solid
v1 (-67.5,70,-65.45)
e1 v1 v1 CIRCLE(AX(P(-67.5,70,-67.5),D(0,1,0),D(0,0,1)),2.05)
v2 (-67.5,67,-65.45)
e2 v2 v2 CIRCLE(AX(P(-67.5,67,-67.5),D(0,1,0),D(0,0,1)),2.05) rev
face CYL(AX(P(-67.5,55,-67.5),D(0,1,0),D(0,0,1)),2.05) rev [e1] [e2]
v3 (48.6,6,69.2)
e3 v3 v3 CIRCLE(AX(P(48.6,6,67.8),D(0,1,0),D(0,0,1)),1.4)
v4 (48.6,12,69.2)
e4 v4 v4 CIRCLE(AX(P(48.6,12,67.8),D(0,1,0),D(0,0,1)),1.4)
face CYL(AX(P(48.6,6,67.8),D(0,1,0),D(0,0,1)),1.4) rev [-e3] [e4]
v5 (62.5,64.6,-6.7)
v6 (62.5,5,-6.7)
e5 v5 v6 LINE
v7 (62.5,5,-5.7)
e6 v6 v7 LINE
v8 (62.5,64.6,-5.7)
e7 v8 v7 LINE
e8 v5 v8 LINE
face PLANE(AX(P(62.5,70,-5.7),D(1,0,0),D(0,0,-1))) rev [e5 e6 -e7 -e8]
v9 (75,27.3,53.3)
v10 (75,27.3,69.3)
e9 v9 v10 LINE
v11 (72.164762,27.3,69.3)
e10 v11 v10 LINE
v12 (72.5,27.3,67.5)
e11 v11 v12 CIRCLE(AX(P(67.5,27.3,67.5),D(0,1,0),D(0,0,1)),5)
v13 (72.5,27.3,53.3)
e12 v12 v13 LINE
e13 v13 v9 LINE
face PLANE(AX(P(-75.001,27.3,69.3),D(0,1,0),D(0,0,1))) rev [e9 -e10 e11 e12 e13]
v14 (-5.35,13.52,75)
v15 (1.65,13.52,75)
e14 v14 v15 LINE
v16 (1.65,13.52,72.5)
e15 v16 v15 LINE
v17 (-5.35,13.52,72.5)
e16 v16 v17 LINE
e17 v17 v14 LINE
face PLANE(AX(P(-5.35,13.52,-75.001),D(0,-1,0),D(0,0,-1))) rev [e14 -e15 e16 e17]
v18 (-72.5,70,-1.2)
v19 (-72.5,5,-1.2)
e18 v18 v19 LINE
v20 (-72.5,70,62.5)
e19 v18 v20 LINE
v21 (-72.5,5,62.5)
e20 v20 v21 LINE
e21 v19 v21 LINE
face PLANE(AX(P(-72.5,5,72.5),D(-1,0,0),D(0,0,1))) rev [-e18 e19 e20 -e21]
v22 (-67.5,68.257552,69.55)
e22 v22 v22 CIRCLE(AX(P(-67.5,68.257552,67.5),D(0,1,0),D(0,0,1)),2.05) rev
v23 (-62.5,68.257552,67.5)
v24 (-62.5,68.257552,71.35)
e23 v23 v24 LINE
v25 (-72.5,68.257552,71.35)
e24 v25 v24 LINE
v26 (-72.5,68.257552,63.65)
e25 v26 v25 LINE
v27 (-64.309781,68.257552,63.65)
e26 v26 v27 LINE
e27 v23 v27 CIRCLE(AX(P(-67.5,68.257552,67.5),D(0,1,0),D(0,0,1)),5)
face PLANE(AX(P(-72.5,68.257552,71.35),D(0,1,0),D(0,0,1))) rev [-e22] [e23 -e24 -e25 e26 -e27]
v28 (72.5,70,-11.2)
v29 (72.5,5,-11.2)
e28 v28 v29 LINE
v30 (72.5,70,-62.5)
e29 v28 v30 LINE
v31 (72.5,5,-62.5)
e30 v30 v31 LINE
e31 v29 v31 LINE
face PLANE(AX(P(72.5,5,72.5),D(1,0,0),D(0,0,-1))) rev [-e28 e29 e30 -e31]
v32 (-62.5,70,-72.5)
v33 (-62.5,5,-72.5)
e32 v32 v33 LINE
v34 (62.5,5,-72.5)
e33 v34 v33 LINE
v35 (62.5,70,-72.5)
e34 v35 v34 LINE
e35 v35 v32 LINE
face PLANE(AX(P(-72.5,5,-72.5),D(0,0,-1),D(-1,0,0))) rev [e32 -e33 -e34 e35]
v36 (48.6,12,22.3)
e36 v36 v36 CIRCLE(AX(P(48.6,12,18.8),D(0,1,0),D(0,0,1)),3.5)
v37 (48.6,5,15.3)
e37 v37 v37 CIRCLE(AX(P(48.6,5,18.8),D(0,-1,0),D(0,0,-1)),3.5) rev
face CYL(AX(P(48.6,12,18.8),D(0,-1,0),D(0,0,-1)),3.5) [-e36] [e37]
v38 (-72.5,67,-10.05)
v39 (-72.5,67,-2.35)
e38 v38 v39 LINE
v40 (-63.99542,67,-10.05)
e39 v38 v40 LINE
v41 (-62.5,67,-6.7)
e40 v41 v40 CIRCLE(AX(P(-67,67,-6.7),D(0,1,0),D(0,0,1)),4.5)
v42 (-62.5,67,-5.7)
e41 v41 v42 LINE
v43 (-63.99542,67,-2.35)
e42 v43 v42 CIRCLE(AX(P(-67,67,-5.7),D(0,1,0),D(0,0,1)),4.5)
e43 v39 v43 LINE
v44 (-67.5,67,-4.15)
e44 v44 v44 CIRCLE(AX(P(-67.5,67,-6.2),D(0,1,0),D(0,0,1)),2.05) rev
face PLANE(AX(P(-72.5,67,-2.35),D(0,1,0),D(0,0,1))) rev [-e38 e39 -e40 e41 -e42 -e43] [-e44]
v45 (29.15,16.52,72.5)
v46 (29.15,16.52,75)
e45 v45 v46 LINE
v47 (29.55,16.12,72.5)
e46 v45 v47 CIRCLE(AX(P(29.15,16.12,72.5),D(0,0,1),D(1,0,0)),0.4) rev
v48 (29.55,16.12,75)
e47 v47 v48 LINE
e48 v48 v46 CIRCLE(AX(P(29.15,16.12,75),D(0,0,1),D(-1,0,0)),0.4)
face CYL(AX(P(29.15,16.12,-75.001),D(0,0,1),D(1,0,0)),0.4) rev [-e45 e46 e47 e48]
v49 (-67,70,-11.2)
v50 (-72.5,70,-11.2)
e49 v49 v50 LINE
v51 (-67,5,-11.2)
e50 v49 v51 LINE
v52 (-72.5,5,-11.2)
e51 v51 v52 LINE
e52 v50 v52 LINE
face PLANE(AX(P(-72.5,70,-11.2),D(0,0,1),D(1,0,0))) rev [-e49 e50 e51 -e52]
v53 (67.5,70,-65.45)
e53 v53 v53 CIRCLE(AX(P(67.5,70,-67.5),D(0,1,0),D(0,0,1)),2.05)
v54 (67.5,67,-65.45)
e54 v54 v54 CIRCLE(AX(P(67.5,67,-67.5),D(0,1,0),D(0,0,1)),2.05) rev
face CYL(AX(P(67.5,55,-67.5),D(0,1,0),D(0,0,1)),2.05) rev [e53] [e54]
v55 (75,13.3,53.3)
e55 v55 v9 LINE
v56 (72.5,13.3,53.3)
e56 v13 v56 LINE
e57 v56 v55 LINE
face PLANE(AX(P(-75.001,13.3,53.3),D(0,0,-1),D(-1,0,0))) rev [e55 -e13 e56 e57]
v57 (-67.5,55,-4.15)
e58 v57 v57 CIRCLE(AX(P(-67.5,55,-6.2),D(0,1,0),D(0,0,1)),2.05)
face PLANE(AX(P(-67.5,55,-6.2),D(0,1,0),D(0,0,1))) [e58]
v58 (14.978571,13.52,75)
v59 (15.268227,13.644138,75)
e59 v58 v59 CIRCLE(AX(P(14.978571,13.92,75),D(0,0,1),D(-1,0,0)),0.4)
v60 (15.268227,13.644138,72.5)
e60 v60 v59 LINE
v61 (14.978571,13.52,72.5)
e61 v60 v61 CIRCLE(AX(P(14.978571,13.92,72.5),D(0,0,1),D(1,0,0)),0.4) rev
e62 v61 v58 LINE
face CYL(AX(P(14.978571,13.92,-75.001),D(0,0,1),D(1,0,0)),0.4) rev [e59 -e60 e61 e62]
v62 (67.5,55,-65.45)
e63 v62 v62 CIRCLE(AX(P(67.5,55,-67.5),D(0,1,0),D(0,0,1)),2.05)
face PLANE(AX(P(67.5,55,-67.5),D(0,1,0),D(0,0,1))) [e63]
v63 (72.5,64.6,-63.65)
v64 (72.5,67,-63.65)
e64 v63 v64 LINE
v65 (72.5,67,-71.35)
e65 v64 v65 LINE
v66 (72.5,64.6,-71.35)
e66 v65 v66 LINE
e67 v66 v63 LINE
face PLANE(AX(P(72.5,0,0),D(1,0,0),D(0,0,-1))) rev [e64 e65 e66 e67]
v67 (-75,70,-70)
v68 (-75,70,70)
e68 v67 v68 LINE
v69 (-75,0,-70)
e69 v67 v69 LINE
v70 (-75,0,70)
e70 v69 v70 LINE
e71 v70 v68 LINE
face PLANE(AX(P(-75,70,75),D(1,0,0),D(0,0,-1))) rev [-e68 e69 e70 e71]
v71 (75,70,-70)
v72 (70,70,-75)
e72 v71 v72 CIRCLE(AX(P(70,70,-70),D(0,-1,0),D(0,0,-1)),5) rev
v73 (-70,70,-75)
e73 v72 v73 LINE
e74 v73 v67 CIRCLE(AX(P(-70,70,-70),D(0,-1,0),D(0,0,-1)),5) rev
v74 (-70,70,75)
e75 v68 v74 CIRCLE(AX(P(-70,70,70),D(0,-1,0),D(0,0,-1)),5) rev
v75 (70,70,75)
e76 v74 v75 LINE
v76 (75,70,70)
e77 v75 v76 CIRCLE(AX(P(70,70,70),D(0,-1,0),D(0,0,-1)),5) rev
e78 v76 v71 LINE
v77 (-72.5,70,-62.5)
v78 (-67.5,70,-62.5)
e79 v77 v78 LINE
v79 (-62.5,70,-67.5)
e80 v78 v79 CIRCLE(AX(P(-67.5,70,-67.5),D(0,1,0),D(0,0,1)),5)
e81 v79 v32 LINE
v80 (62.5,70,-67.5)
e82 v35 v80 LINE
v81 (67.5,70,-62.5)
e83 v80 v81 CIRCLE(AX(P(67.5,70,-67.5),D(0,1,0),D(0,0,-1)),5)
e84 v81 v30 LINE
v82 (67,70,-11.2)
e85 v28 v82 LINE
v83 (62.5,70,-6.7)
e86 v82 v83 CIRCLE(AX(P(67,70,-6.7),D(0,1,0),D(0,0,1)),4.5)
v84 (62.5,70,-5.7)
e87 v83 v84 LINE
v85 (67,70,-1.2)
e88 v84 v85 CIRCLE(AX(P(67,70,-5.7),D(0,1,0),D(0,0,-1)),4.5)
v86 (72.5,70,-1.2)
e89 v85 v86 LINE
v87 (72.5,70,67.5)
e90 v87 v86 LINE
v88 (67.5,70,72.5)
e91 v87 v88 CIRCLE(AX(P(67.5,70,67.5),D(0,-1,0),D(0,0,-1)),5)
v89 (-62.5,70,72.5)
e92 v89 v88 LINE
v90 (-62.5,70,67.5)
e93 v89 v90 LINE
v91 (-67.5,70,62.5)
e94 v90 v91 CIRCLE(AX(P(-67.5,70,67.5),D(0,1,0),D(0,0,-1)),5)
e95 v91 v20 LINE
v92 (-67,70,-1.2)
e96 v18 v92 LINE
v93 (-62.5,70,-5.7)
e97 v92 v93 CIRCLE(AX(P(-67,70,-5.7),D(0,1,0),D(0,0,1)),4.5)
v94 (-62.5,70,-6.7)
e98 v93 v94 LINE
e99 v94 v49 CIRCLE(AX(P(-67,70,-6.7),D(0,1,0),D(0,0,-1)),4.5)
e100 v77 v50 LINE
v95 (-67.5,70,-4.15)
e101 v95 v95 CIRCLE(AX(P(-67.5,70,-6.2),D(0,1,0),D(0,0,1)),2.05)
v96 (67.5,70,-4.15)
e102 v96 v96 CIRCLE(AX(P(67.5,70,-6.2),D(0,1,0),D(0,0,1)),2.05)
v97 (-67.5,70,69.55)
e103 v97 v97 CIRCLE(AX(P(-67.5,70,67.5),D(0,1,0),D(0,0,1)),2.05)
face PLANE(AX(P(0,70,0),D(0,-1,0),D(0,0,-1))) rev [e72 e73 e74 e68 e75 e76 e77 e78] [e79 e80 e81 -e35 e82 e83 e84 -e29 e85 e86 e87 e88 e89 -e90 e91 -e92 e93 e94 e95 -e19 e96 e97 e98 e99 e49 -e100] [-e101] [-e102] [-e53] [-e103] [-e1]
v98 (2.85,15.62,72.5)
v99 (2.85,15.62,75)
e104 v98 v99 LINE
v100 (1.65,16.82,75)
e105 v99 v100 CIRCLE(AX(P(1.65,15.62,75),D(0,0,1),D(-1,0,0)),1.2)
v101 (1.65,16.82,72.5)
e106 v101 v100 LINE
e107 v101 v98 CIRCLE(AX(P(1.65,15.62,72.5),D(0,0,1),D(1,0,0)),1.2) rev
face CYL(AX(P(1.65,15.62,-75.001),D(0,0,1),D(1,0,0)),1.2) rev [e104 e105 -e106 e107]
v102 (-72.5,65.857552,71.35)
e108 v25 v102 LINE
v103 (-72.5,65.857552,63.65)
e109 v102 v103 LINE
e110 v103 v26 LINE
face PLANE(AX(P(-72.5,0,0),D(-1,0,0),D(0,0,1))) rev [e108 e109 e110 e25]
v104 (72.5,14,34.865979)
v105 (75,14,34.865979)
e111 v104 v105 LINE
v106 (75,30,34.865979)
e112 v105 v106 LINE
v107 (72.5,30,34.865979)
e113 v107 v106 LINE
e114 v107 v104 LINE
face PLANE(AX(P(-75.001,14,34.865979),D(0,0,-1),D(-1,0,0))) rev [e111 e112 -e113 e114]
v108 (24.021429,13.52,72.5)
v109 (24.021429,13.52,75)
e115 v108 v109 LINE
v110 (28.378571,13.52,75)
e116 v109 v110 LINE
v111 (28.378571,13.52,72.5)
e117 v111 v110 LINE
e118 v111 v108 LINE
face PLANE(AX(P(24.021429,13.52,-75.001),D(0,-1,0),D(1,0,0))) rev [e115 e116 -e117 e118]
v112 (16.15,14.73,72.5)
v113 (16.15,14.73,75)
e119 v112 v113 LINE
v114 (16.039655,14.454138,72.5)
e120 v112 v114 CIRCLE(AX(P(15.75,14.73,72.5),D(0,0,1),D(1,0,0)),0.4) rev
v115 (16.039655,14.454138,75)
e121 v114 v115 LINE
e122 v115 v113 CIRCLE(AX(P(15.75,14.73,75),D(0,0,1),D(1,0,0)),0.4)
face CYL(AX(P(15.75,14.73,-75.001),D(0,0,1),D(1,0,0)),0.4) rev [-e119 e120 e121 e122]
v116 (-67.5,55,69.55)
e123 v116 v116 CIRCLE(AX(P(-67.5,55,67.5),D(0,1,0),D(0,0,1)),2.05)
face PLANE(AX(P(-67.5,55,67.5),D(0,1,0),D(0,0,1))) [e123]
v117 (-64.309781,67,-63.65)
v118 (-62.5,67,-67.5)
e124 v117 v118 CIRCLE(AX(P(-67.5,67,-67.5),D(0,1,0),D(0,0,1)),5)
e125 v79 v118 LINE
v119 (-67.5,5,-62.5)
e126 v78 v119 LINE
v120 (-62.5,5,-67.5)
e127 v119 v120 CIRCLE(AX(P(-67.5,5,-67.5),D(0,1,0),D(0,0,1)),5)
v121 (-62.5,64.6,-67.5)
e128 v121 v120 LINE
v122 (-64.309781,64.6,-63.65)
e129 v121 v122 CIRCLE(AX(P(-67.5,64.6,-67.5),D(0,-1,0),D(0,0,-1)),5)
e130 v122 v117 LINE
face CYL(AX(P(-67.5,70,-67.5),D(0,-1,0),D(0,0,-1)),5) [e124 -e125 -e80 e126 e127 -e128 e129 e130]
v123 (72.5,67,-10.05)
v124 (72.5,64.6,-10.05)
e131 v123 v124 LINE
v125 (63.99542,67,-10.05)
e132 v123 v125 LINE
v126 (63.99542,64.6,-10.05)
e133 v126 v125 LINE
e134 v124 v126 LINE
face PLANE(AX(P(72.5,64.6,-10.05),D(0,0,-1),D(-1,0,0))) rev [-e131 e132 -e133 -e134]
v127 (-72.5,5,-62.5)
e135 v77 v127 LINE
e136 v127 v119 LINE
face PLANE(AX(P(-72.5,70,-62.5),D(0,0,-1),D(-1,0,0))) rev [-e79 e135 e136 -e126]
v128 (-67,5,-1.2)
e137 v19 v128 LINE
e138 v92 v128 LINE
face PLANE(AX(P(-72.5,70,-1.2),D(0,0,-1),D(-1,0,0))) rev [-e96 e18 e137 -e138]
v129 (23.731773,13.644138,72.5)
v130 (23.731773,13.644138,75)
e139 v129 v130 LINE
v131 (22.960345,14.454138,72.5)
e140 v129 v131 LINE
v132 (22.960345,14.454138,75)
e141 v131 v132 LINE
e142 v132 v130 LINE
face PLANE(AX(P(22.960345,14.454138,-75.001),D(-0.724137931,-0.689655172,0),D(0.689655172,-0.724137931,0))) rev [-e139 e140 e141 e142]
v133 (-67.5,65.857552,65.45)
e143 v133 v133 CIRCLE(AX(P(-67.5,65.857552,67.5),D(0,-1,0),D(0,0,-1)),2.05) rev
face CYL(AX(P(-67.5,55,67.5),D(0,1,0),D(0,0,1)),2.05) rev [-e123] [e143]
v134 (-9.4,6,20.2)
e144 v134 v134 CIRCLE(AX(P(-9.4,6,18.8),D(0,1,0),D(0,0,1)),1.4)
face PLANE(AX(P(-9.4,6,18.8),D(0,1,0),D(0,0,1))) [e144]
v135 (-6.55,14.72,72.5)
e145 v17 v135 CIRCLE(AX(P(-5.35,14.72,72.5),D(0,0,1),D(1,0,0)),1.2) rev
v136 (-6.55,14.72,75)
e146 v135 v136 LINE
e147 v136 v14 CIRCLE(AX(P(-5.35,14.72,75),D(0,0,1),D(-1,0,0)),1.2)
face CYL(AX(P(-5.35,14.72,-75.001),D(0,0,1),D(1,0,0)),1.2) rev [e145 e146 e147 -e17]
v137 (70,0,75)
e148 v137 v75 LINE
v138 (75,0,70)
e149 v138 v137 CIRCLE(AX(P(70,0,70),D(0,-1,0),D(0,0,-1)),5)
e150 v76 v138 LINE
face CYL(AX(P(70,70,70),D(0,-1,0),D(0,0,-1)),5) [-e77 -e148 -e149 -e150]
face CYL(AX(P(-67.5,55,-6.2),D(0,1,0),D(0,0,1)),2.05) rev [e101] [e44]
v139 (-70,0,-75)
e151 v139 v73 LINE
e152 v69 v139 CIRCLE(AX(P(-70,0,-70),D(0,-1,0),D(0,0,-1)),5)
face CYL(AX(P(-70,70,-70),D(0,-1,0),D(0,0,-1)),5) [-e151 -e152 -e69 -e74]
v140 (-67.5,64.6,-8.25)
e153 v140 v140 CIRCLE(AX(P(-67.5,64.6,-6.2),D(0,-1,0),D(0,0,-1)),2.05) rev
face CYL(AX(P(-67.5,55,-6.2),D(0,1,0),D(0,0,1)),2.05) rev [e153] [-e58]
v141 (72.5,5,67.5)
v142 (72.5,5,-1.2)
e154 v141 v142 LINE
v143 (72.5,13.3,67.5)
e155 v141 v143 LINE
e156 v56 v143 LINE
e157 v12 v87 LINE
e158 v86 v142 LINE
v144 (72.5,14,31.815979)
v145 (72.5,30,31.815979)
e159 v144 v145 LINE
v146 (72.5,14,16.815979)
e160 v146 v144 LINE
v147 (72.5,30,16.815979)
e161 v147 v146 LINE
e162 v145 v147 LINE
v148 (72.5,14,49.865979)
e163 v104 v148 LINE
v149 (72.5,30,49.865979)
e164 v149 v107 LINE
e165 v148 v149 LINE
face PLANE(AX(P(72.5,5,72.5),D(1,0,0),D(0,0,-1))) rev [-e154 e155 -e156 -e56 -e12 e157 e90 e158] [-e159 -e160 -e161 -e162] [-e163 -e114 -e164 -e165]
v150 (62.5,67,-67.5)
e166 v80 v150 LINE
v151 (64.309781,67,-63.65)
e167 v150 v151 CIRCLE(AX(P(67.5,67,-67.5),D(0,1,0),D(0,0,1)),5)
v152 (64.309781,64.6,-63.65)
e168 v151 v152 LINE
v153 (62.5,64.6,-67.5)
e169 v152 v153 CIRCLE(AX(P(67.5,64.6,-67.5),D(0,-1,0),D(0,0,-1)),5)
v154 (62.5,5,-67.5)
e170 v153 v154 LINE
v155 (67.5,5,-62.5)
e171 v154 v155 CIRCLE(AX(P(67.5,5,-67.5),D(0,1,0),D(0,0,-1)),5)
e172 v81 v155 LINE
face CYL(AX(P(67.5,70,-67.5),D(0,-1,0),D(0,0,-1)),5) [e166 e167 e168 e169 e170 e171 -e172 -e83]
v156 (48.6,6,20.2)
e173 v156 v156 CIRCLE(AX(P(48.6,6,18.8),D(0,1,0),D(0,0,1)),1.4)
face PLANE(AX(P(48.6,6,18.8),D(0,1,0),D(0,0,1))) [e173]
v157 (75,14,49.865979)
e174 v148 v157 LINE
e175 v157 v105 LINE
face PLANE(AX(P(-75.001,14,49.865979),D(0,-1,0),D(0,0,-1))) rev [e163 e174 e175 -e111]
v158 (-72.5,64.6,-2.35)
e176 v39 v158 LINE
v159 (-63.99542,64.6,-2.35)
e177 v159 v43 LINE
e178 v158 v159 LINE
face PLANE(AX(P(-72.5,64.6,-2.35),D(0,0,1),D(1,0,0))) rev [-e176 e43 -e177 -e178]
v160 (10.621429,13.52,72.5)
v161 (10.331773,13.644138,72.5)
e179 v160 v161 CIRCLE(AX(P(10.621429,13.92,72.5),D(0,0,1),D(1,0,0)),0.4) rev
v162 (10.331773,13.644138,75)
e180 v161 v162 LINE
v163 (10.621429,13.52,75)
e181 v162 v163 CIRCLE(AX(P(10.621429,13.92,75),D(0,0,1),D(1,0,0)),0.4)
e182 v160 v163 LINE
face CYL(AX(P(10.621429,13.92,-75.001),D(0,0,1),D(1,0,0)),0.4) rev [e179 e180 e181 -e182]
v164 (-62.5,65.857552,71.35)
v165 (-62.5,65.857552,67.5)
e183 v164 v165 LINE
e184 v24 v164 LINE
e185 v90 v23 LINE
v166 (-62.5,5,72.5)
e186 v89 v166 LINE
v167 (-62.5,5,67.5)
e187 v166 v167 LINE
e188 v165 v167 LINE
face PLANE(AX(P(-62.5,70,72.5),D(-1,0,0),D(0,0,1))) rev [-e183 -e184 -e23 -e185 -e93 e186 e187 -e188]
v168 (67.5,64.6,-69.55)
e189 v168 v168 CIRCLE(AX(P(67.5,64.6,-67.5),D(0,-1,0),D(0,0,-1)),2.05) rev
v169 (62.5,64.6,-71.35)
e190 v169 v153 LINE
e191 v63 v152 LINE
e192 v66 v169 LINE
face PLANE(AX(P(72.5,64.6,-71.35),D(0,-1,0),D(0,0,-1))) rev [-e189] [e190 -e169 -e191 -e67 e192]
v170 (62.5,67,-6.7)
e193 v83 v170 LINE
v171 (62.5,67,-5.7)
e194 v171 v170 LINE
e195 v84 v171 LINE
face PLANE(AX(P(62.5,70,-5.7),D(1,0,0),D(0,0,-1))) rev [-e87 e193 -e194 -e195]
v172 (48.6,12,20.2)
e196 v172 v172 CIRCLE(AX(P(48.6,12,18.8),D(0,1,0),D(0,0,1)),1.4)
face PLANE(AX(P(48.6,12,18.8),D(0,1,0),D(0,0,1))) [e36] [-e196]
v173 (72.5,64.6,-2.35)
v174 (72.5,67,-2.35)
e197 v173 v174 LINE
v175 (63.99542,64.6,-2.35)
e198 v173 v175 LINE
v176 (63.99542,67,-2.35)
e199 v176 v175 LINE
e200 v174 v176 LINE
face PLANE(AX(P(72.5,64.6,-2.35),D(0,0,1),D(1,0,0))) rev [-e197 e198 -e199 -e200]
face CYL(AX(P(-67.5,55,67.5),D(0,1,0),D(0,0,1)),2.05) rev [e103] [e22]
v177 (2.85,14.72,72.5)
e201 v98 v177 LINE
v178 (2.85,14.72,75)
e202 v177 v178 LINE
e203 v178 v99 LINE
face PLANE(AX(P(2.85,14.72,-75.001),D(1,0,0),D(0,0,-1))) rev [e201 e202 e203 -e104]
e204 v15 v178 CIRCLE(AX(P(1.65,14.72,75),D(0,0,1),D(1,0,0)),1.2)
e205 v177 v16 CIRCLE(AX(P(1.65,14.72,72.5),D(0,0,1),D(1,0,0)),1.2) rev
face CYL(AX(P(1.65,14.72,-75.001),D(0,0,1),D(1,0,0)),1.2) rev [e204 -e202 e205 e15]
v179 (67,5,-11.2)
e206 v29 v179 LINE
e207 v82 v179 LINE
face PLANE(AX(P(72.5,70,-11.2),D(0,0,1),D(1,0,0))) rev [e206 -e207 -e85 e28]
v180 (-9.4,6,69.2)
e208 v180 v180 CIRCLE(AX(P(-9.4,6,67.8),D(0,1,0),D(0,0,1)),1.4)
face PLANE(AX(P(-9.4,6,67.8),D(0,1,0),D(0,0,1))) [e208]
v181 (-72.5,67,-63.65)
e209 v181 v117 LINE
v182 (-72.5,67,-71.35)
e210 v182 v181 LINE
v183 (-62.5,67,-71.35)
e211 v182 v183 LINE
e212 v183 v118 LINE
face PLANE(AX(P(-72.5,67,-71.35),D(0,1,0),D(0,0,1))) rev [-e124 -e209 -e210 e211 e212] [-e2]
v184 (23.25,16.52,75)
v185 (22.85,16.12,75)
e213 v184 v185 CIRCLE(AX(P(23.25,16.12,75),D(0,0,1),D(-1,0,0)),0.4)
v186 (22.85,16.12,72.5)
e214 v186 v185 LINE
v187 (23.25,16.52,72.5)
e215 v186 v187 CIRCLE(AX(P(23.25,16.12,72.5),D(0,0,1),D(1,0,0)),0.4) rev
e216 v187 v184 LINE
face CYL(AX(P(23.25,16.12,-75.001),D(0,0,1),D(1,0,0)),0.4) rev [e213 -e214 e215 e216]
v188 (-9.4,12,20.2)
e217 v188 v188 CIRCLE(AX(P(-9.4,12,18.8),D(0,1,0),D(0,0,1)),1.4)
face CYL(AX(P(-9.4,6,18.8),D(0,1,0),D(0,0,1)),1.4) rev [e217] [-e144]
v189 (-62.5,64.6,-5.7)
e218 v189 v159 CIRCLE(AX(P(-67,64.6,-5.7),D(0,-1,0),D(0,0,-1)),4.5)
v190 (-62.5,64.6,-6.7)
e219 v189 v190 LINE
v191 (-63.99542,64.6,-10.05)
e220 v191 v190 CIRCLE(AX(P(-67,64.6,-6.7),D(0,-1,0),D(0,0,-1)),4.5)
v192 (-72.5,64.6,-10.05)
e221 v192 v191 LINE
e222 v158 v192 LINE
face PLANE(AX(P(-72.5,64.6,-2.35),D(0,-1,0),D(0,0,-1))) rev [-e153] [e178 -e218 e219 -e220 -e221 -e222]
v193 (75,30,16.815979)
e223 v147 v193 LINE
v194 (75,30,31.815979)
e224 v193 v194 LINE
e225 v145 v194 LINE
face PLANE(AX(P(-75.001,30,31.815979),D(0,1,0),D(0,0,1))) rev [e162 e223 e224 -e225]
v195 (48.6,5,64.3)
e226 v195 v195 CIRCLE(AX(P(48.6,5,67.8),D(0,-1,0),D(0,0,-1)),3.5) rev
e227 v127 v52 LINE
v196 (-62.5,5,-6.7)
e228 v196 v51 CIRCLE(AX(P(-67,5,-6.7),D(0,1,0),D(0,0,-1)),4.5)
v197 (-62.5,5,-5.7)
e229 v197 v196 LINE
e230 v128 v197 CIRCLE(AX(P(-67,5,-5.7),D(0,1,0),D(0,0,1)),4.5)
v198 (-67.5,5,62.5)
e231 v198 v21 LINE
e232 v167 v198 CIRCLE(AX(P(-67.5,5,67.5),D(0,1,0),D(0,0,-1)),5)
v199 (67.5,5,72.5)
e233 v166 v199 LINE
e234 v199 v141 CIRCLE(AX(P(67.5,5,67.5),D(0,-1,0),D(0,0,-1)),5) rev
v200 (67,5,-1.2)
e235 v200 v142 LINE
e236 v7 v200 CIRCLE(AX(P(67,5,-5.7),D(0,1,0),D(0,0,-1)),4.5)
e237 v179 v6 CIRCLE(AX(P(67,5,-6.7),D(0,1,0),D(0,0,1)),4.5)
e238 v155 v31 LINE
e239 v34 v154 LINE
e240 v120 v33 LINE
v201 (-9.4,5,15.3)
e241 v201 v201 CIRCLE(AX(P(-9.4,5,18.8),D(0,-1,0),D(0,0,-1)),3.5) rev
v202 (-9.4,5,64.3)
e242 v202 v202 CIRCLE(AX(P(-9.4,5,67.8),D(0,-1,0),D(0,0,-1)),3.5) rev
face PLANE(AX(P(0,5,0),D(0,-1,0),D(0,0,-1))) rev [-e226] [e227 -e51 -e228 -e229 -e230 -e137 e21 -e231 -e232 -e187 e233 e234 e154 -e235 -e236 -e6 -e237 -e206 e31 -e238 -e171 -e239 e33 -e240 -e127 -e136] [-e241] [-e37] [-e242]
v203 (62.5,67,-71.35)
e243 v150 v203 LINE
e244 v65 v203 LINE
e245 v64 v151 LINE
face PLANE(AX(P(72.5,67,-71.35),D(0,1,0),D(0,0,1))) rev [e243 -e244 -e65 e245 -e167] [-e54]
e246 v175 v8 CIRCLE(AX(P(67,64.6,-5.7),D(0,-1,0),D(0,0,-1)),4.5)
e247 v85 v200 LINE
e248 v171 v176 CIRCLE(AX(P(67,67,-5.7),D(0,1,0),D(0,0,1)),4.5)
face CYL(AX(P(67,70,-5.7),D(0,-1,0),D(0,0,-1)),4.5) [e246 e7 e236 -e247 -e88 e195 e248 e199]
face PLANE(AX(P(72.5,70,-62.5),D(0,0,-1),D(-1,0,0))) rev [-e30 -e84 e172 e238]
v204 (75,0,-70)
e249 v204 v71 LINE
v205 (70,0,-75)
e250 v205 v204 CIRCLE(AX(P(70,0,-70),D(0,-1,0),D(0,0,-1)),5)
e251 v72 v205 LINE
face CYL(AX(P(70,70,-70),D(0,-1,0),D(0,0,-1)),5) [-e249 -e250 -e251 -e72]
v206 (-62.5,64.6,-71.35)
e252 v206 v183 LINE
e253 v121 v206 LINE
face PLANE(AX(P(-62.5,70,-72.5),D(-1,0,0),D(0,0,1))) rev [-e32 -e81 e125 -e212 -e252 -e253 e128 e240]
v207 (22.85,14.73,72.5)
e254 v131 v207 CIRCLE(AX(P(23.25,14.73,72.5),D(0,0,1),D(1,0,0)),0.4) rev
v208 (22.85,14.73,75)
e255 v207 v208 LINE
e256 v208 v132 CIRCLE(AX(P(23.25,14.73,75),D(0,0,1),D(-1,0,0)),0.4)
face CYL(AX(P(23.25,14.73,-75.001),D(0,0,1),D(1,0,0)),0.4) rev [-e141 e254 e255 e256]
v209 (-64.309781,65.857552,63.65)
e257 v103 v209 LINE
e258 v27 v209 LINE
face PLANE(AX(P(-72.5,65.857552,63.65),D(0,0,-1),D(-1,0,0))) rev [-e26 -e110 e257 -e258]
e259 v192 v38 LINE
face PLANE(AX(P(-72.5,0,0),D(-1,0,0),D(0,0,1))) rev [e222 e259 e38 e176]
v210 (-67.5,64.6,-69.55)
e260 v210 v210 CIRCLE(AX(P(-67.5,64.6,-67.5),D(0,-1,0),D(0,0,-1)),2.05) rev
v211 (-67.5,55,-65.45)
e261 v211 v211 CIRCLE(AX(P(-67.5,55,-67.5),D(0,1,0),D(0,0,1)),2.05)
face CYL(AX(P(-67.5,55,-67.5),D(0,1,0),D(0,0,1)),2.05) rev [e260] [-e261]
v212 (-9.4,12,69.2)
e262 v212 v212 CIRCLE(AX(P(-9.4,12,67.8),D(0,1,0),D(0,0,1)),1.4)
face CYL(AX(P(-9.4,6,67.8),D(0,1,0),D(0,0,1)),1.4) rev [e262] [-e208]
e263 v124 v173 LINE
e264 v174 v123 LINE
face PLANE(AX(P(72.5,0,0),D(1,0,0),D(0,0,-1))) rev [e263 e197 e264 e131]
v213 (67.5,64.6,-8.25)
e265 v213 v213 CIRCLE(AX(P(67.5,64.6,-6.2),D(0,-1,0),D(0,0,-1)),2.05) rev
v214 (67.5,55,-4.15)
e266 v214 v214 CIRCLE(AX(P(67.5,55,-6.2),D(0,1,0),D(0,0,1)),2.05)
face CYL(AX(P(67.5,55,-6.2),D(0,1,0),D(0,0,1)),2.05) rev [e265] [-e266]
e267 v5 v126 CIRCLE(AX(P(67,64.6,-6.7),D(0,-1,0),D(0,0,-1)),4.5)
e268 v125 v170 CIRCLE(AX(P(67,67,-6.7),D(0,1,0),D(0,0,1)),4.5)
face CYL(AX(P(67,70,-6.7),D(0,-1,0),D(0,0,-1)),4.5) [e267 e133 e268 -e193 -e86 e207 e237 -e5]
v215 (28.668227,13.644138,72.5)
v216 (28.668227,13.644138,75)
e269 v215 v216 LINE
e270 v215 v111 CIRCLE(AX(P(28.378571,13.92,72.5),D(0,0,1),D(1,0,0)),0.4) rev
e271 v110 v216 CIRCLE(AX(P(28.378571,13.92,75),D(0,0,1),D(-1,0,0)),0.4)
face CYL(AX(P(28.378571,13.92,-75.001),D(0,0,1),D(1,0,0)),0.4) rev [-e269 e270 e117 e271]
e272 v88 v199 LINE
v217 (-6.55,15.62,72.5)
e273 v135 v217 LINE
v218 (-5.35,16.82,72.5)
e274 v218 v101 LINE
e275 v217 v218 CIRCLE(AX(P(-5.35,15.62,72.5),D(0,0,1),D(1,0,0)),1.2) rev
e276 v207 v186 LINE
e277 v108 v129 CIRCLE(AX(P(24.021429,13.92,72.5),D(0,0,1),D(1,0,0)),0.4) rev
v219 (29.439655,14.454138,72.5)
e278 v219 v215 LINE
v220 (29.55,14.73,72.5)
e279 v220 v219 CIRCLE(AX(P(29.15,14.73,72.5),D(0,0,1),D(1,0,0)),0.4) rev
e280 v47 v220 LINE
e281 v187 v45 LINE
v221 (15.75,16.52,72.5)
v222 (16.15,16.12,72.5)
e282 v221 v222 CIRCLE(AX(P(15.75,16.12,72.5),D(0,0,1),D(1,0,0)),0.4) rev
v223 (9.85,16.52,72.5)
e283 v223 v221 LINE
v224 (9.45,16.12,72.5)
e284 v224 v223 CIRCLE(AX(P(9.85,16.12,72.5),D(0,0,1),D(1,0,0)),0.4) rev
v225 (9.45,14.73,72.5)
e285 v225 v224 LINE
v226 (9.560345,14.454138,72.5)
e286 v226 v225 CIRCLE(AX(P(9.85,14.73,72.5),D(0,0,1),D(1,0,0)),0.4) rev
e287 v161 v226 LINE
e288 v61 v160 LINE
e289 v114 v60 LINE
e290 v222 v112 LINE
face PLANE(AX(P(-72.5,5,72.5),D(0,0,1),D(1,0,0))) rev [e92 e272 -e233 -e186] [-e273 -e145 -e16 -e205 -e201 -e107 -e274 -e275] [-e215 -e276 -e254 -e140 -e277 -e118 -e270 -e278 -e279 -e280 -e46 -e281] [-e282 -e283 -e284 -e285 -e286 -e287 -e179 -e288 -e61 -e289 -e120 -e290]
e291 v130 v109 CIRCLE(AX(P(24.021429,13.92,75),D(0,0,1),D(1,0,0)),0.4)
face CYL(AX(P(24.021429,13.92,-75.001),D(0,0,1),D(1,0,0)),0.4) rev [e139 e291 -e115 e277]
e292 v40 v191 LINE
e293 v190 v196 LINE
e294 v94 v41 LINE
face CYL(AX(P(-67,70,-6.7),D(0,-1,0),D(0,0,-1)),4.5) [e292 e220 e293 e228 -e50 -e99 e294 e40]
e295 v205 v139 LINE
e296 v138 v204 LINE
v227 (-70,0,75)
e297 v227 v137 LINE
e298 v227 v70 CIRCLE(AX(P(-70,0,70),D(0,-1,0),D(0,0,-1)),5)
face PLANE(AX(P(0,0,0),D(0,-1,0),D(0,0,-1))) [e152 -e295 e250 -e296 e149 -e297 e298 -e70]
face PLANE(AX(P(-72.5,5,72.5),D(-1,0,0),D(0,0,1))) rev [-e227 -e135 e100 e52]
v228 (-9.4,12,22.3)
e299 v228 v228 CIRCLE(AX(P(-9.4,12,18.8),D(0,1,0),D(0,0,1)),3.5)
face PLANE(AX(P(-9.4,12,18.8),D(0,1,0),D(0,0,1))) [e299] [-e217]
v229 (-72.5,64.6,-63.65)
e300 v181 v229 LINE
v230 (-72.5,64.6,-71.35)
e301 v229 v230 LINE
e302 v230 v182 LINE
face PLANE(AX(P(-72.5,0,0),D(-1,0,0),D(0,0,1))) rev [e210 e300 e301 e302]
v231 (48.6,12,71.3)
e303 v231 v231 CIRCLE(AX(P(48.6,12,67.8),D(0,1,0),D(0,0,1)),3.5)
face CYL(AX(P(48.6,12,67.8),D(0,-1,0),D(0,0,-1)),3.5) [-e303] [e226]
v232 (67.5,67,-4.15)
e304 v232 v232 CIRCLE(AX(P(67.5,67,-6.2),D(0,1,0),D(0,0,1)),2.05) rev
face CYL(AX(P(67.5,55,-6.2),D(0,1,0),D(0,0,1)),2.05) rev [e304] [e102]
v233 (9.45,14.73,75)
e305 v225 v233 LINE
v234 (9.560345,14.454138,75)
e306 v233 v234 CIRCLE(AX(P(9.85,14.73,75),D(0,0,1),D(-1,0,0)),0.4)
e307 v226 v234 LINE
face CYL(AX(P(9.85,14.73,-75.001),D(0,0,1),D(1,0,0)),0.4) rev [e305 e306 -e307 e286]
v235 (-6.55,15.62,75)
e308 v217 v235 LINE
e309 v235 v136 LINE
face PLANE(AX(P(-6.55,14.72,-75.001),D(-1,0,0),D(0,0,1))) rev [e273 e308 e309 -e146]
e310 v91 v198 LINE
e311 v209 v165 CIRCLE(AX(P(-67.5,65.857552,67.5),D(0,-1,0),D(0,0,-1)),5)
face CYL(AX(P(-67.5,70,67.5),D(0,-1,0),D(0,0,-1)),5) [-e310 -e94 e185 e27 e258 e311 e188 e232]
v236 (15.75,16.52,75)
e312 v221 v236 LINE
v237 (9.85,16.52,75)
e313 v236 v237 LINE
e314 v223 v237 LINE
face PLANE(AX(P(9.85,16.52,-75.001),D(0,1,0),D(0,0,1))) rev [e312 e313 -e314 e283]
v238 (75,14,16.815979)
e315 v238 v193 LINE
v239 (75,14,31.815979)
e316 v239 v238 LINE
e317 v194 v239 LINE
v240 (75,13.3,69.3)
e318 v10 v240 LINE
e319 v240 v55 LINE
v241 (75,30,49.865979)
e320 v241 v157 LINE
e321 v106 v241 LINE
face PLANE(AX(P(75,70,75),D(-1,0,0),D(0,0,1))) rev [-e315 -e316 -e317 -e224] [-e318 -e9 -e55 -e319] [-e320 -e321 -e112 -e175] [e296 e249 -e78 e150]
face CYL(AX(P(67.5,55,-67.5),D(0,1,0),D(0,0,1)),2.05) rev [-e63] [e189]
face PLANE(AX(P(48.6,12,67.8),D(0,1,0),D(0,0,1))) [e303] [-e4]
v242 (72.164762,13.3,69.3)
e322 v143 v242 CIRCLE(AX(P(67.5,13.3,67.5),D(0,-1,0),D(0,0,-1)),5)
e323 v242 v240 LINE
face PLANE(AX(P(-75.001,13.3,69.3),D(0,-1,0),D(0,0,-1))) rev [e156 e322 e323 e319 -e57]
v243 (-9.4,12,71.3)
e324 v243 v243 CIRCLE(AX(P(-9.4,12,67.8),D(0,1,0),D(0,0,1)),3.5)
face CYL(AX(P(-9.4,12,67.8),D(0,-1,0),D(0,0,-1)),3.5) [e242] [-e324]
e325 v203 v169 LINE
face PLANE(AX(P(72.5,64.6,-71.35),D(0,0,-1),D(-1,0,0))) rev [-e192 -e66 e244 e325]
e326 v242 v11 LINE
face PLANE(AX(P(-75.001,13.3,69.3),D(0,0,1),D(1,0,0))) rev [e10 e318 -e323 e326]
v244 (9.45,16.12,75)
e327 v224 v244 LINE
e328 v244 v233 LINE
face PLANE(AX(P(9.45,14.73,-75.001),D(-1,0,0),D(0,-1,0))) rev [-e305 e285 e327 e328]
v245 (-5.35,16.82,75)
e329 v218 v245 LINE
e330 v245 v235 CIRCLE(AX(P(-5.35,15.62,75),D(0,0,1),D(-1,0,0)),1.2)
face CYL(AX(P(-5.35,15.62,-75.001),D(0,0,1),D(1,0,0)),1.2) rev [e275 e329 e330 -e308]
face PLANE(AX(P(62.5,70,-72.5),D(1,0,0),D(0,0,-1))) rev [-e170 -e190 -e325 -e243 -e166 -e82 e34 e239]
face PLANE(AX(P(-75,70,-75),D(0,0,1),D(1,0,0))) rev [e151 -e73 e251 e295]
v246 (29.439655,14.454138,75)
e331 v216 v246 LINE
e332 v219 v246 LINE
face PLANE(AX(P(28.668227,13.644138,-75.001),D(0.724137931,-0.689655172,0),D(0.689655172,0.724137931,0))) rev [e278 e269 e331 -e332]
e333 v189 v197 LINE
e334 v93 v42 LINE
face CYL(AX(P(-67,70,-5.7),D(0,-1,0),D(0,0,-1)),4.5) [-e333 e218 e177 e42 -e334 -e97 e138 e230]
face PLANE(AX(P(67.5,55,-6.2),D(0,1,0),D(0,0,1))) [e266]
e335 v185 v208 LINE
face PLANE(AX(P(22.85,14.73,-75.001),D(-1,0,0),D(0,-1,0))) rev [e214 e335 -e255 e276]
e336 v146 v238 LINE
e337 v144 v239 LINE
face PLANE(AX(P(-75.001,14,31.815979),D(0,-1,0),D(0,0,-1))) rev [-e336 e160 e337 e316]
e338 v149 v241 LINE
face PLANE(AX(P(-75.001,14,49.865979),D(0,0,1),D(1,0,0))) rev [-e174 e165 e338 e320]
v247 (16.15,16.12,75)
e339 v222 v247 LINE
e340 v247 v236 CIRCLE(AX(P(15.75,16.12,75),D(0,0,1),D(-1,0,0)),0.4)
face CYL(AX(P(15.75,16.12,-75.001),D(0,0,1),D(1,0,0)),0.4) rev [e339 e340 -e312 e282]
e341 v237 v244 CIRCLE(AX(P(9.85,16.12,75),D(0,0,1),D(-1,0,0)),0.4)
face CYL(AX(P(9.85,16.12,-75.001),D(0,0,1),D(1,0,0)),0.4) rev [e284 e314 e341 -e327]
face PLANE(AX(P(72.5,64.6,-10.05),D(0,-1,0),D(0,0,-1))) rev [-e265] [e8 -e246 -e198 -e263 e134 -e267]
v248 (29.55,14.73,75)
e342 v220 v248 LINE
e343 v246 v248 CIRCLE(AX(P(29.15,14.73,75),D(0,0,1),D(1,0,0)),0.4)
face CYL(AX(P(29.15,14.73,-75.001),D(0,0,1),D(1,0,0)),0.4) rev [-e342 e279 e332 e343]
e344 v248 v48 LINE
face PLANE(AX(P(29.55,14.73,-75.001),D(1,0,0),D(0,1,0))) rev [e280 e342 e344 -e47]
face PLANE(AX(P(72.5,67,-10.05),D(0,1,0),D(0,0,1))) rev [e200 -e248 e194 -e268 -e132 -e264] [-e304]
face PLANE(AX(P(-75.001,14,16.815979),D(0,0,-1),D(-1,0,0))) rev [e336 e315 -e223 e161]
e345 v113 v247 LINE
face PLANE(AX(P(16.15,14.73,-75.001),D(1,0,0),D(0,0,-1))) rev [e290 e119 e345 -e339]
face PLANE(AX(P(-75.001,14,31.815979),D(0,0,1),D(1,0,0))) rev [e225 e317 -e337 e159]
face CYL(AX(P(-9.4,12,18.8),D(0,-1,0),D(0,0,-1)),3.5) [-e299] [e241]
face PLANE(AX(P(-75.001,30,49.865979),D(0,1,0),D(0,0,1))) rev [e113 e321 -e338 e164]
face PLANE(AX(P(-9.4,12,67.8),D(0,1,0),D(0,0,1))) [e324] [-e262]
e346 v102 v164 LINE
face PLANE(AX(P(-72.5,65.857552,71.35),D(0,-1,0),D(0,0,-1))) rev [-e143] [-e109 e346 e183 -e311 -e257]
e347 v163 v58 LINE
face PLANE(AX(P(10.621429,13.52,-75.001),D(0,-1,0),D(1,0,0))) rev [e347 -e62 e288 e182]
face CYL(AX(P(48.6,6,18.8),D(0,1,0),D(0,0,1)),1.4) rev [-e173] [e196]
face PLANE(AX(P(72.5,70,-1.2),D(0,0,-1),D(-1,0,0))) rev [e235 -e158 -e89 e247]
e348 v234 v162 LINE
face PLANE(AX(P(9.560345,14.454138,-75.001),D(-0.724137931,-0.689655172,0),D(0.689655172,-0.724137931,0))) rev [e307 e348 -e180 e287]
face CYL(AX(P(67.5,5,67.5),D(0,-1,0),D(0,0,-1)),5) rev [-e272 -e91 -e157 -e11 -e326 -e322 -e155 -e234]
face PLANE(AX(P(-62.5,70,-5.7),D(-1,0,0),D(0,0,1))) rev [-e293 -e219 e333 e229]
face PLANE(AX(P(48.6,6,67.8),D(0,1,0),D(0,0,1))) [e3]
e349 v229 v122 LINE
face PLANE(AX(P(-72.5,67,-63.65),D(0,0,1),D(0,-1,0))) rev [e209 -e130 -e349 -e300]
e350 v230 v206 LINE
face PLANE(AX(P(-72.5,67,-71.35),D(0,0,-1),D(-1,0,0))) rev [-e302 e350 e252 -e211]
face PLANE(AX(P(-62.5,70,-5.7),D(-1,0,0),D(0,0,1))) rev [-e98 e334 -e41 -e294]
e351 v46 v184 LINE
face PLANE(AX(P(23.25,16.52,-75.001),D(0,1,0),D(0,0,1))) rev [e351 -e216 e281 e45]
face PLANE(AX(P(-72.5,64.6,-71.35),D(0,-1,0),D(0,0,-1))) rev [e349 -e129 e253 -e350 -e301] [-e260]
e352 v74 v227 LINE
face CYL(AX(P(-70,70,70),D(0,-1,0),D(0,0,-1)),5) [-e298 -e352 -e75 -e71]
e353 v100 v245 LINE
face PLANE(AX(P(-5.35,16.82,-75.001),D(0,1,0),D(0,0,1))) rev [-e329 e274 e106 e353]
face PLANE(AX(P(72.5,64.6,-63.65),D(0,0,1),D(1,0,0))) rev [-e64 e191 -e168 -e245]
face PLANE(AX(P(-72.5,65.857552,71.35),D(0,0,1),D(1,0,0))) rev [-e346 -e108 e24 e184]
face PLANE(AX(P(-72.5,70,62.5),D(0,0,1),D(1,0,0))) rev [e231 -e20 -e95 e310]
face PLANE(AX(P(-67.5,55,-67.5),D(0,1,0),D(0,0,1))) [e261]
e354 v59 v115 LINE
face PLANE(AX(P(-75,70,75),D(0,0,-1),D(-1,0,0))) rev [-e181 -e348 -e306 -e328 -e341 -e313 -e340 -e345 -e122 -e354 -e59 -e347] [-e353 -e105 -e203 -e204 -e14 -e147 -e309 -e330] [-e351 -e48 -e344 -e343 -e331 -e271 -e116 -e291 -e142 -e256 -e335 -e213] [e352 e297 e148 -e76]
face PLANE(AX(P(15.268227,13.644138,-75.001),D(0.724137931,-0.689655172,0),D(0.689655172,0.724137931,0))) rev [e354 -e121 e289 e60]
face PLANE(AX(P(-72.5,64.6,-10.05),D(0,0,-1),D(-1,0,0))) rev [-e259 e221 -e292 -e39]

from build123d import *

# Parameters (mm, degrees)
CROQUIS2_W              = 150
CROQUIS2_H              = 150
SALIENTE_EXTRUIR1_DEPTH = 70
CROQUIS3_W              = 145
CROQUIS3_H              = 145
CORTAR_EXTRUIR1_DEPTH   = 65
CROQUIS4_R              = 3.5
SALIENTE_EXTRUIR3_DEPTH = 7
CROQUIS5_R              = 1.4
CORTAR_EXTRUIR2_DEPTH   = 6
CORTAR_EXTRUIR3_REACH   = 183.728
CROQUIS7_W              = 16
CROQUIS7_H              = 14
CROQUIS7_W_2            = 15
CROQUIS7_H_2            = 16
CORTAR_EXTRUIR4_REACH   = 183.728
SALIENTE_EXTRUIR4_DEPTH = 65
CROQUIS10_R             = 2.05
CORTAR_EXTRUIR5_DEPTH   = 15
CROQUIS11_W             = 7.7
CROQUIS11_H             = 2.4
CORTAR_EXTRUIR6_DEPTH   = 10
CROQUIS12_W             = 7.7
CROQUIS12_H             = 2.4
CORTAR_EXTRUIR7_DEPTH   = 10
REDONDEO1_R             = 5
REDONDEO2_R             = 5


with BuildPart() as part:
    # Croquis2 → Saliente-Extruir1 (new body)
    with BuildSketch(Plane(origin=(0, 0, 0), x_dir=(1, 0, 0), z_dir=(0, 1, 0))):
        Rectangle(CROQUIS2_W, CROQUIS2_H)
    extrude(amount=SALIENTE_EXTRUIR1_DEPTH)

    # Croquis3 → Cortar-Extruir1 (cut)
    with BuildSketch(Plane(origin=(0, 70, 0), x_dir=(1, 0, 0), z_dir=(0, 1, 0))):
        Rectangle(CROQUIS3_W, CROQUIS3_H)
    extrude(amount=-CORTAR_EXTRUIR1_DEPTH, mode=Mode.SUBTRACT)

    # Croquis4 → Saliente-Extruir3 (add)
    with BuildSketch(Plane(origin=(0, 5, 0), x_dir=(1, 0, 0), z_dir=(0, 1, 0))):
        with Locations(Location((-9.4, -67.8, 0), (0, 0, 90))):
            Circle(CROQUIS4_R)
        with Locations(Location((48.6, -67.8, 0), (0, 0, 90))):
            Circle(CROQUIS4_R)
        with Locations(Location((-9.4, -18.8, 0), (0, 0, 90))):
            Circle(CROQUIS4_R)
        with Locations(Location((48.6, -18.8, 0), (0, 0, 90))):
            Circle(CROQUIS4_R)
    extrude(amount=SALIENTE_EXTRUIR3_DEPTH)

    # Croquis5 → Cortar-Extruir2 (cut)
    with BuildSketch(Plane(origin=(0, 12, 0), x_dir=(1, 0, 0), z_dir=(0, 1, 0))):
        with Locations(Location((-9.4, -18.8, 0), (0, 0, 270))):
            Circle(CROQUIS5_R)
        with Locations(Location((48.6, -18.8, 0), (0, 0, 270))):
            Circle(CROQUIS5_R)
        with Locations(Location((-9.4, -67.8, 0), (0, 0, 270))):
            Circle(CROQUIS5_R)
        with Locations(Location((48.6, -67.8, 0), (0, 0, 270))):
            Circle(CROQUIS5_R)
    extrude(amount=-CORTAR_EXTRUIR2_DEPTH, mode=Mode.SUBTRACT)

    # Croquis7 → Cortar-Extruir3 (cut, up to next)
    with BuildSketch(Plane(origin=(75, 0, 0), x_dir=(0, 0, -1), z_dir=(1, 0, 0)), mode=Mode.PRIVATE) as cortar_extruir3_sk1:
        with Locations((-61.3, 20.3)):
            Rectangle(CROQUIS7_W, CROQUIS7_H)
    cortar_extruir3_tool1 = extrude(cortar_extruir3_sk1.sketch, amount=-CORTAR_EXTRUIR3_REACH, mode=Mode.PRIVATE) & part.part
    # Croquis7 → Cortar-Extruir3 (cut, up to next)
    with BuildSketch(Plane(origin=(75, 0, 0), x_dir=(0, 0, -1), z_dir=(1, 0, 0)), mode=Mode.PRIVATE) as cortar_extruir3_sk2:
        with Locations((-42.365979033, 22)):
            Rectangle(CROQUIS7_W_2, CROQUIS7_H_2)
    cortar_extruir3_tool2 = extrude(cortar_extruir3_sk2.sketch, amount=-CORTAR_EXTRUIR3_REACH, mode=Mode.PRIVATE) & part.part
    # Croquis7 → Cortar-Extruir3 (cut, up to next)
    with BuildSketch(Plane(origin=(75, 0, 0), x_dir=(0, 0, -1), z_dir=(1, 0, 0)), mode=Mode.PRIVATE) as cortar_extruir3_sk3:
        with Locations((-24.315979033, 22)):
            Rectangle(CROQUIS7_W_2, CROQUIS7_H_2)
    cortar_extruir3_tool3 = extrude(cortar_extruir3_sk3.sketch, amount=-CORTAR_EXTRUIR3_REACH, mode=Mode.PRIVATE) & part.part
    add(cortar_extruir3_tool1.solids().sort_by_distance((75, 20.3, 61.3))[0], mode=Mode.SUBTRACT)
    add(cortar_extruir3_tool2.solids().sort_by_distance((75, 22, 42.365979))[0], mode=Mode.SUBTRACT)
    add(cortar_extruir3_tool3.solids().sort_by_distance((75, 22, 24.315979))[0], mode=Mode.SUBTRACT)

    # Croquis8 → Cortar-Extruir4 (cut, up to next)
    with BuildSketch(Plane.XY.offset(75), mode=Mode.PRIVATE) as cortar_extruir4_sk1:
        with BuildLine():
            Line((24.021428571, 13.52), (28.378571429, 13.52))
            ThreePointArc((28.378571429, 13.52), (28.536139148, 13.552341988), (28.668226601, 13.644137931))
            Line((28.668226601, 13.644137931), (29.439655172, 14.454137931))
            ThreePointArc((29.439655172, 14.454137931), (29.521390676, 14.581443729), (29.55, 14.73))
            Line((29.55, 14.73), (29.55, 16.12))
            ThreePointArc((29.55, 16.12), (29.432842712, 16.402842712), (29.15, 16.52))
            Line((29.15, 16.52), (23.25, 16.52))
            ThreePointArc((23.25, 16.52), (22.967157288, 16.402842712), (22.85, 16.12))
            Line((22.85, 16.12), (22.85, 14.73))
            ThreePointArc((22.85, 14.73), (22.878609324, 14.581443729), (22.960344828, 14.454137931))
            Line((22.960344828, 14.454137931), (23.731773399, 13.644137931))
            ThreePointArc((23.731773399, 13.644137931), (23.863860852, 13.552341988), (24.021428571, 13.52))
        make_face()
    cortar_extruir4_tool1 = extrude(cortar_extruir4_sk1.sketch, amount=-CORTAR_EXTRUIR4_REACH, mode=Mode.PRIVATE) & part.part
    # Croquis8 → Cortar-Extruir4 (cut, up to next)
    with BuildSketch(Plane.XY.offset(75), mode=Mode.PRIVATE) as cortar_extruir4_sk2:
        with BuildLine():
            Line((9.560344828, 14.454137931), (10.331773399, 13.644137931))
            ThreePointArc((10.331773399, 13.644137931), (10.463860852, 13.552341988), (10.621428571, 13.52))
            Line((10.621428571, 13.52), (14.978571429, 13.52))
            ThreePointArc((14.978571429, 13.52), (15.136139148, 13.552341988), (15.268226601, 13.644137931))
            Line((15.268226601, 13.644137931), (16.039655172, 14.454137931))
            ThreePointArc((16.039655172, 14.454137931), (16.121390676, 14.581443729), (16.15, 14.73))
            Line((16.15, 14.73), (16.15, 16.12))
            ThreePointArc((16.15, 16.12), (16.032842712, 16.402842712), (15.75, 16.52))
            Line((15.75, 16.52), (9.85, 16.52))
            ThreePointArc((9.85, 16.52), (9.567157288, 16.402842712), (9.45, 16.12))
            Line((9.45, 16.12), (9.45, 14.73))
            ThreePointArc((9.45, 14.73), (9.478609324, 14.581443729), (9.560344828, 14.454137931))
        make_face()
    cortar_extruir4_tool2 = extrude(cortar_extruir4_sk2.sketch, amount=-CORTAR_EXTRUIR4_REACH, mode=Mode.PRIVATE) & part.part
    # Croquis8 → Cortar-Extruir4 (cut, up to next)
    with BuildSketch(Plane.XY.offset(75), mode=Mode.PRIVATE) as cortar_extruir4_sk3:
        with BuildLine():
            Line((-5.35, 13.52), (1.65, 13.52))
            ThreePointArc((1.65, 13.52), (2.498528137, 13.871471863), (2.85, 14.72))
            Line((2.85, 14.72), (2.85, 15.62))
            ThreePointArc((2.85, 15.62), (2.498528137, 16.468528137), (1.65, 16.82))
            Line((1.65, 16.82), (-5.35, 16.82))
            ThreePointArc((-5.35, 16.82), (-6.198528137, 16.468528137), (-6.55, 15.62))
            Line((-6.55, 15.62), (-6.55, 14.72))
            ThreePointArc((-6.55, 14.72), (-6.198528137, 13.871471863), (-5.35, 13.52))
        make_face()
    cortar_extruir4_tool3 = extrude(cortar_extruir4_sk3.sketch, amount=-CORTAR_EXTRUIR4_REACH, mode=Mode.PRIVATE) & part.part
    add(cortar_extruir4_tool1.solids().sort_by_distance((26.2, 15.079288, 75))[0], mode=Mode.SUBTRACT)
    add(cortar_extruir4_tool2.solids().sort_by_distance((12.8, 15.079288, 75))[0], mode=Mode.SUBTRACT)
    add(cortar_extruir4_tool3.solids().sort_by_distance((-1.85, 15.17, 75))[0], mode=Mode.SUBTRACT)

    # Croquis9 → Saliente-Extruir4 (add, through all)
    with BuildSketch(Plane(origin=(0, 5, 0), x_dir=(1, 0, 0), z_dir=(0, 1, 0))):
        with BuildLine():
            Line((-72.5, -72.5), (-62.5, -72.5))
            Line((-62.5, -72.5), (-62.5, -67.5))
            ThreePointArc((-62.5, -67.5), (-63.964466094, -63.964466094), (-67.5, -62.5))
            Line((-67.5, -62.5), (-72.5, -62.5))
            Line((-72.5, -62.5), (-72.5, -72.5))
        make_face()
        with BuildLine():
            Line((-72.5, 72.5), (-62.5, 72.5))
            Line((-62.5, 72.5), (-62.5, 67.5))
            ThreePointArc((-62.5, 67.5), (-63.964466094, 63.964466094), (-67.5, 62.5))
            Line((-67.5, 62.5), (-72.5, 62.5))
            Line((-72.5, 62.5), (-72.5, 72.5))
        make_face()
        with BuildLine():
            Line((72.5, 72.5), (62.5, 72.5))
            Line((62.5, 72.5), (62.5, 67.5))
            ThreePointArc((62.5, 67.5), (63.964466094, 63.964466094), (67.5, 62.5))
            Line((67.5, 62.5), (72.5, 62.5))
            Line((72.5, 62.5), (72.5, 72.5))
        make_face()
        with BuildLine():
            Line((72.5, 1.2), (67, 1.2))
            ThreePointArc((67, 1.2), (63.818019485, 2.518019485), (62.5, 5.7))
            Line((62.5, 5.7), (62.5, 6.7))
            ThreePointArc((62.5, 6.7), (63.818019485, 9.881980515), (67, 11.2))
            Line((67, 11.2), (72.5, 11.2))
            Line((72.5, 11.2), (72.5, 1.2))
        make_face()
        with BuildLine():
            Line((-72.5, 1.2), (-67, 1.2))
            ThreePointArc((-67, 1.2), (-63.818019485, 2.518019485), (-62.5, 5.7))
            Line((-62.5, 5.7), (-62.5, 6.7))
            ThreePointArc((-62.5, 6.7), (-63.818019485, 9.881980515), (-67, 11.2))
            Line((-67, 11.2), (-72.5, 11.2))
            Line((-72.5, 11.2), (-72.5, 1.2))
        make_face()
    extrude(amount=SALIENTE_EXTRUIR4_DEPTH)

    # Croquis10 → Cortar-Extruir5 (cut)
    with BuildSketch(Plane(origin=(0, 70, 0), x_dir=(1, 0, 0), z_dir=(0, 1, 0))):
        with Locations(Location((-67.5, 67.5, 0), (0, 0, 270))):
            Circle(CROQUIS10_R)
        with Locations(Location((-67.5, 6.2, 0), (0, 0, 270))):
            Circle(CROQUIS10_R)
        with Locations(Location((-67.5, -67.5, 0), (0, 0, 270))):
            Circle(CROQUIS10_R)
        with Locations(Location((67.5, 67.5, 0), (0, 0, 270))):
            Circle(CROQUIS10_R)
        with Locations(Location((67.5, 6.2, 0), (0, 0, 270))):
            Circle(CROQUIS10_R)
    extrude(amount=-CORTAR_EXTRUIR5_DEPTH, mode=Mode.SUBTRACT)

    # Croquis11 → Cortar-Extruir6 (cut)
    with BuildSketch(Plane(origin=(-62.5, 0, 0), x_dir=(0, 0, -1), z_dir=(1, 0, 0))):
        with Locations((67.5, 65.8)):
            Rectangle(CROQUIS11_W, CROQUIS11_H)
        with Locations((6.2, 65.8)):
            Rectangle(CROQUIS11_W, CROQUIS11_H)
        with Locations((-67.5, 67.057552177)):
            Rectangle(CROQUIS11_W, CROQUIS11_H)
    extrude(amount=-CORTAR_EXTRUIR6_DEPTH, mode=Mode.SUBTRACT)

    # Croquis12 → Cortar-Extruir7 (cut)
    with BuildSketch(Plane.ZY.offset(-62.5)):
        with Locations((-67.5, 65.8)):
            Rectangle(CROQUIS12_W, CROQUIS12_H)
        with Locations((-6.2, 65.8)):
            Rectangle(CROQUIS12_W, CROQUIS12_H)
    extrude(amount=-CORTAR_EXTRUIR7_DEPTH, mode=Mode.SUBTRACT)

    # Redondeo1
    redondeo1_edges = [part.edges().sort_by_distance(p)[0] for p in [
        (75, 35, 75),
        (-75, 35, 75),
        (-75, 35, -75),
        (75, 35, -75),
    ]]
    fillet(redondeo1_edges, radius=REDONDEO1_R)

    # Redondeo2
    # the kernel refuses this fillet: 5 mm, written as the material it adds along each edge
    with BuildSketch(Plane(origin=(72.5, 70, 72.5), x_dir=(-1, 0, 0), z_dir=(0, -1, 0))) as redondeo2_piece_1_section:
        with BuildLine():
            CenterArc((REDONDEO2_R, REDONDEO2_R), REDONDEO2_R, 180, 90)
            Line((0, REDONDEO2_R), (0, 0))
            Line((0, 0), (REDONDEO2_R, 0))
        make_face()
    redondeo2_piece_1 = extrude(amount=65, mode=Mode.PRIVATE)
    redondeo2_piece_1 = split(redondeo2_piece_1, bisect_by=Plane(origin=(71.298407374, 27.3, 71.540307306), z_dir=(0, 1, 0)), keep=Keep.TOP, mode=Mode.PRIVATE)
    redondeo2_piece_1 = split(redondeo2_piece_1, bisect_by=Plane(origin=(71.298407374, 48.65, 69.3), z_dir=(0, 0, 1)), keep=Keep.TOP, mode=Mode.PRIVATE)
    add(redondeo2_piece_1)
    with BuildSketch(Plane(origin=(72.5, 70, 72.5), x_dir=(-1, 0, 0), z_dir=(0, -1, 0))) as redondeo2_piece_2_section:
        with BuildLine():
            CenterArc((REDONDEO2_R, REDONDEO2_R), REDONDEO2_R, 180, 90)
            Line((0, REDONDEO2_R), (0, 0))
            Line((0, 0), (REDONDEO2_R, 0))
        make_face()
    redondeo2_piece_2 = extrude(amount=65, mode=Mode.PRIVATE)
    redondeo2_piece_2 = split(redondeo2_piece_2, bisect_by=Plane(origin=(72.471377344, 27.3, 68.63753235), z_dir=(0, 1, 0)), keep=Keep.TOP, mode=Mode.PRIVATE)
    redondeo2_piece_2 = split(redondeo2_piece_2, bisect_by=Plane(origin=(72.471377344, 48.65, 69.3), z_dir=(0, 0, -1)), keep=Keep.TOP, mode=Mode.PRIVATE)
    add(redondeo2_piece_2)
    with BuildSketch(Plane(origin=(72.5, 70, 72.5), x_dir=(-1, 0, 0), z_dir=(0, -1, 0))) as redondeo2_piece_3_section:
        with BuildLine():
            CenterArc((REDONDEO2_R, REDONDEO2_R), REDONDEO2_R, 180, 90)
            Line((0, REDONDEO2_R), (0, 0))
            Line((0, 0), (REDONDEO2_R, 0))
        make_face()
    redondeo2_piece_3 = extrude(amount=65, mode=Mode.PRIVATE)
    redondeo2_piece_3 = split(redondeo2_piece_3, bisect_by=Plane(origin=(71.298407374, 27.3, 71.540307306), z_dir=(0, -1, 0)), keep=Keep.TOP, mode=Mode.PRIVATE)
    redondeo2_piece_3 = split(redondeo2_piece_3, bisect_by=Plane(origin=(71.298407374, 13.3, 71.540307306), z_dir=(0, 1, 0)), keep=Keep.TOP, mode=Mode.PRIVATE)
    redondeo2_piece_3 = split(redondeo2_piece_3, bisect_by=Plane(origin=(71.298407374, 20.3, 69.3), z_dir=(0, 0, 1)), keep=Keep.TOP, mode=Mode.PRIVATE)
    add(redondeo2_piece_3)
    with BuildSketch(Plane(origin=(72.5, 70, 72.5), x_dir=(-1, 0, 0), z_dir=(0, -1, 0))) as redondeo2_piece_4_section:
        with BuildLine():
            CenterArc((REDONDEO2_R, REDONDEO2_R), REDONDEO2_R, 180, 90)
            Line((0, REDONDEO2_R), (0, 0))
            Line((0, 0), (REDONDEO2_R, 0))
        make_face()
    redondeo2_piece_4 = extrude(amount=65, mode=Mode.PRIVATE)
    redondeo2_piece_4 = split(redondeo2_piece_4, bisect_by=Plane(origin=(71.298407374, 13.3, 71.540307306), z_dir=(0, -1, 0)), keep=Keep.TOP, mode=Mode.PRIVATE)
    redondeo2_piece_4 = split(redondeo2_piece_4, bisect_by=Plane(origin=(71.298407374, 9.15, 69.3), z_dir=(0, 0, 1)), keep=Keep.TOP, mode=Mode.PRIVATE)
    add(redondeo2_piece_4)
    with BuildSketch(Plane(origin=(72.5, 70, 72.5), x_dir=(-1, 0, 0), z_dir=(0, -1, 0))) as redondeo2_piece_5_section:
        with BuildLine():
            CenterArc((REDONDEO2_R, REDONDEO2_R), REDONDEO2_R, 180, 90)
            Line((0, REDONDEO2_R), (0, 0))
            Line((0, 0), (REDONDEO2_R, 0))
        make_face()
    redondeo2_piece_5 = extrude(amount=65, mode=Mode.PRIVATE)
    redondeo2_piece_5 = split(redondeo2_piece_5, bisect_by=Plane(origin=(72.471377344, 13.3, 68.63753235), z_dir=(0, -1, 0)), keep=Keep.TOP, mode=Mode.PRIVATE)
    redondeo2_piece_5 = split(redondeo2_piece_5, bisect_by=Plane(origin=(72.471377344, 9.15, 69.3), z_dir=(0, 0, -1)), keep=Keep.TOP, mode=Mode.PRIVATE)
    add(redondeo2_piece_5)


solid = part.part
